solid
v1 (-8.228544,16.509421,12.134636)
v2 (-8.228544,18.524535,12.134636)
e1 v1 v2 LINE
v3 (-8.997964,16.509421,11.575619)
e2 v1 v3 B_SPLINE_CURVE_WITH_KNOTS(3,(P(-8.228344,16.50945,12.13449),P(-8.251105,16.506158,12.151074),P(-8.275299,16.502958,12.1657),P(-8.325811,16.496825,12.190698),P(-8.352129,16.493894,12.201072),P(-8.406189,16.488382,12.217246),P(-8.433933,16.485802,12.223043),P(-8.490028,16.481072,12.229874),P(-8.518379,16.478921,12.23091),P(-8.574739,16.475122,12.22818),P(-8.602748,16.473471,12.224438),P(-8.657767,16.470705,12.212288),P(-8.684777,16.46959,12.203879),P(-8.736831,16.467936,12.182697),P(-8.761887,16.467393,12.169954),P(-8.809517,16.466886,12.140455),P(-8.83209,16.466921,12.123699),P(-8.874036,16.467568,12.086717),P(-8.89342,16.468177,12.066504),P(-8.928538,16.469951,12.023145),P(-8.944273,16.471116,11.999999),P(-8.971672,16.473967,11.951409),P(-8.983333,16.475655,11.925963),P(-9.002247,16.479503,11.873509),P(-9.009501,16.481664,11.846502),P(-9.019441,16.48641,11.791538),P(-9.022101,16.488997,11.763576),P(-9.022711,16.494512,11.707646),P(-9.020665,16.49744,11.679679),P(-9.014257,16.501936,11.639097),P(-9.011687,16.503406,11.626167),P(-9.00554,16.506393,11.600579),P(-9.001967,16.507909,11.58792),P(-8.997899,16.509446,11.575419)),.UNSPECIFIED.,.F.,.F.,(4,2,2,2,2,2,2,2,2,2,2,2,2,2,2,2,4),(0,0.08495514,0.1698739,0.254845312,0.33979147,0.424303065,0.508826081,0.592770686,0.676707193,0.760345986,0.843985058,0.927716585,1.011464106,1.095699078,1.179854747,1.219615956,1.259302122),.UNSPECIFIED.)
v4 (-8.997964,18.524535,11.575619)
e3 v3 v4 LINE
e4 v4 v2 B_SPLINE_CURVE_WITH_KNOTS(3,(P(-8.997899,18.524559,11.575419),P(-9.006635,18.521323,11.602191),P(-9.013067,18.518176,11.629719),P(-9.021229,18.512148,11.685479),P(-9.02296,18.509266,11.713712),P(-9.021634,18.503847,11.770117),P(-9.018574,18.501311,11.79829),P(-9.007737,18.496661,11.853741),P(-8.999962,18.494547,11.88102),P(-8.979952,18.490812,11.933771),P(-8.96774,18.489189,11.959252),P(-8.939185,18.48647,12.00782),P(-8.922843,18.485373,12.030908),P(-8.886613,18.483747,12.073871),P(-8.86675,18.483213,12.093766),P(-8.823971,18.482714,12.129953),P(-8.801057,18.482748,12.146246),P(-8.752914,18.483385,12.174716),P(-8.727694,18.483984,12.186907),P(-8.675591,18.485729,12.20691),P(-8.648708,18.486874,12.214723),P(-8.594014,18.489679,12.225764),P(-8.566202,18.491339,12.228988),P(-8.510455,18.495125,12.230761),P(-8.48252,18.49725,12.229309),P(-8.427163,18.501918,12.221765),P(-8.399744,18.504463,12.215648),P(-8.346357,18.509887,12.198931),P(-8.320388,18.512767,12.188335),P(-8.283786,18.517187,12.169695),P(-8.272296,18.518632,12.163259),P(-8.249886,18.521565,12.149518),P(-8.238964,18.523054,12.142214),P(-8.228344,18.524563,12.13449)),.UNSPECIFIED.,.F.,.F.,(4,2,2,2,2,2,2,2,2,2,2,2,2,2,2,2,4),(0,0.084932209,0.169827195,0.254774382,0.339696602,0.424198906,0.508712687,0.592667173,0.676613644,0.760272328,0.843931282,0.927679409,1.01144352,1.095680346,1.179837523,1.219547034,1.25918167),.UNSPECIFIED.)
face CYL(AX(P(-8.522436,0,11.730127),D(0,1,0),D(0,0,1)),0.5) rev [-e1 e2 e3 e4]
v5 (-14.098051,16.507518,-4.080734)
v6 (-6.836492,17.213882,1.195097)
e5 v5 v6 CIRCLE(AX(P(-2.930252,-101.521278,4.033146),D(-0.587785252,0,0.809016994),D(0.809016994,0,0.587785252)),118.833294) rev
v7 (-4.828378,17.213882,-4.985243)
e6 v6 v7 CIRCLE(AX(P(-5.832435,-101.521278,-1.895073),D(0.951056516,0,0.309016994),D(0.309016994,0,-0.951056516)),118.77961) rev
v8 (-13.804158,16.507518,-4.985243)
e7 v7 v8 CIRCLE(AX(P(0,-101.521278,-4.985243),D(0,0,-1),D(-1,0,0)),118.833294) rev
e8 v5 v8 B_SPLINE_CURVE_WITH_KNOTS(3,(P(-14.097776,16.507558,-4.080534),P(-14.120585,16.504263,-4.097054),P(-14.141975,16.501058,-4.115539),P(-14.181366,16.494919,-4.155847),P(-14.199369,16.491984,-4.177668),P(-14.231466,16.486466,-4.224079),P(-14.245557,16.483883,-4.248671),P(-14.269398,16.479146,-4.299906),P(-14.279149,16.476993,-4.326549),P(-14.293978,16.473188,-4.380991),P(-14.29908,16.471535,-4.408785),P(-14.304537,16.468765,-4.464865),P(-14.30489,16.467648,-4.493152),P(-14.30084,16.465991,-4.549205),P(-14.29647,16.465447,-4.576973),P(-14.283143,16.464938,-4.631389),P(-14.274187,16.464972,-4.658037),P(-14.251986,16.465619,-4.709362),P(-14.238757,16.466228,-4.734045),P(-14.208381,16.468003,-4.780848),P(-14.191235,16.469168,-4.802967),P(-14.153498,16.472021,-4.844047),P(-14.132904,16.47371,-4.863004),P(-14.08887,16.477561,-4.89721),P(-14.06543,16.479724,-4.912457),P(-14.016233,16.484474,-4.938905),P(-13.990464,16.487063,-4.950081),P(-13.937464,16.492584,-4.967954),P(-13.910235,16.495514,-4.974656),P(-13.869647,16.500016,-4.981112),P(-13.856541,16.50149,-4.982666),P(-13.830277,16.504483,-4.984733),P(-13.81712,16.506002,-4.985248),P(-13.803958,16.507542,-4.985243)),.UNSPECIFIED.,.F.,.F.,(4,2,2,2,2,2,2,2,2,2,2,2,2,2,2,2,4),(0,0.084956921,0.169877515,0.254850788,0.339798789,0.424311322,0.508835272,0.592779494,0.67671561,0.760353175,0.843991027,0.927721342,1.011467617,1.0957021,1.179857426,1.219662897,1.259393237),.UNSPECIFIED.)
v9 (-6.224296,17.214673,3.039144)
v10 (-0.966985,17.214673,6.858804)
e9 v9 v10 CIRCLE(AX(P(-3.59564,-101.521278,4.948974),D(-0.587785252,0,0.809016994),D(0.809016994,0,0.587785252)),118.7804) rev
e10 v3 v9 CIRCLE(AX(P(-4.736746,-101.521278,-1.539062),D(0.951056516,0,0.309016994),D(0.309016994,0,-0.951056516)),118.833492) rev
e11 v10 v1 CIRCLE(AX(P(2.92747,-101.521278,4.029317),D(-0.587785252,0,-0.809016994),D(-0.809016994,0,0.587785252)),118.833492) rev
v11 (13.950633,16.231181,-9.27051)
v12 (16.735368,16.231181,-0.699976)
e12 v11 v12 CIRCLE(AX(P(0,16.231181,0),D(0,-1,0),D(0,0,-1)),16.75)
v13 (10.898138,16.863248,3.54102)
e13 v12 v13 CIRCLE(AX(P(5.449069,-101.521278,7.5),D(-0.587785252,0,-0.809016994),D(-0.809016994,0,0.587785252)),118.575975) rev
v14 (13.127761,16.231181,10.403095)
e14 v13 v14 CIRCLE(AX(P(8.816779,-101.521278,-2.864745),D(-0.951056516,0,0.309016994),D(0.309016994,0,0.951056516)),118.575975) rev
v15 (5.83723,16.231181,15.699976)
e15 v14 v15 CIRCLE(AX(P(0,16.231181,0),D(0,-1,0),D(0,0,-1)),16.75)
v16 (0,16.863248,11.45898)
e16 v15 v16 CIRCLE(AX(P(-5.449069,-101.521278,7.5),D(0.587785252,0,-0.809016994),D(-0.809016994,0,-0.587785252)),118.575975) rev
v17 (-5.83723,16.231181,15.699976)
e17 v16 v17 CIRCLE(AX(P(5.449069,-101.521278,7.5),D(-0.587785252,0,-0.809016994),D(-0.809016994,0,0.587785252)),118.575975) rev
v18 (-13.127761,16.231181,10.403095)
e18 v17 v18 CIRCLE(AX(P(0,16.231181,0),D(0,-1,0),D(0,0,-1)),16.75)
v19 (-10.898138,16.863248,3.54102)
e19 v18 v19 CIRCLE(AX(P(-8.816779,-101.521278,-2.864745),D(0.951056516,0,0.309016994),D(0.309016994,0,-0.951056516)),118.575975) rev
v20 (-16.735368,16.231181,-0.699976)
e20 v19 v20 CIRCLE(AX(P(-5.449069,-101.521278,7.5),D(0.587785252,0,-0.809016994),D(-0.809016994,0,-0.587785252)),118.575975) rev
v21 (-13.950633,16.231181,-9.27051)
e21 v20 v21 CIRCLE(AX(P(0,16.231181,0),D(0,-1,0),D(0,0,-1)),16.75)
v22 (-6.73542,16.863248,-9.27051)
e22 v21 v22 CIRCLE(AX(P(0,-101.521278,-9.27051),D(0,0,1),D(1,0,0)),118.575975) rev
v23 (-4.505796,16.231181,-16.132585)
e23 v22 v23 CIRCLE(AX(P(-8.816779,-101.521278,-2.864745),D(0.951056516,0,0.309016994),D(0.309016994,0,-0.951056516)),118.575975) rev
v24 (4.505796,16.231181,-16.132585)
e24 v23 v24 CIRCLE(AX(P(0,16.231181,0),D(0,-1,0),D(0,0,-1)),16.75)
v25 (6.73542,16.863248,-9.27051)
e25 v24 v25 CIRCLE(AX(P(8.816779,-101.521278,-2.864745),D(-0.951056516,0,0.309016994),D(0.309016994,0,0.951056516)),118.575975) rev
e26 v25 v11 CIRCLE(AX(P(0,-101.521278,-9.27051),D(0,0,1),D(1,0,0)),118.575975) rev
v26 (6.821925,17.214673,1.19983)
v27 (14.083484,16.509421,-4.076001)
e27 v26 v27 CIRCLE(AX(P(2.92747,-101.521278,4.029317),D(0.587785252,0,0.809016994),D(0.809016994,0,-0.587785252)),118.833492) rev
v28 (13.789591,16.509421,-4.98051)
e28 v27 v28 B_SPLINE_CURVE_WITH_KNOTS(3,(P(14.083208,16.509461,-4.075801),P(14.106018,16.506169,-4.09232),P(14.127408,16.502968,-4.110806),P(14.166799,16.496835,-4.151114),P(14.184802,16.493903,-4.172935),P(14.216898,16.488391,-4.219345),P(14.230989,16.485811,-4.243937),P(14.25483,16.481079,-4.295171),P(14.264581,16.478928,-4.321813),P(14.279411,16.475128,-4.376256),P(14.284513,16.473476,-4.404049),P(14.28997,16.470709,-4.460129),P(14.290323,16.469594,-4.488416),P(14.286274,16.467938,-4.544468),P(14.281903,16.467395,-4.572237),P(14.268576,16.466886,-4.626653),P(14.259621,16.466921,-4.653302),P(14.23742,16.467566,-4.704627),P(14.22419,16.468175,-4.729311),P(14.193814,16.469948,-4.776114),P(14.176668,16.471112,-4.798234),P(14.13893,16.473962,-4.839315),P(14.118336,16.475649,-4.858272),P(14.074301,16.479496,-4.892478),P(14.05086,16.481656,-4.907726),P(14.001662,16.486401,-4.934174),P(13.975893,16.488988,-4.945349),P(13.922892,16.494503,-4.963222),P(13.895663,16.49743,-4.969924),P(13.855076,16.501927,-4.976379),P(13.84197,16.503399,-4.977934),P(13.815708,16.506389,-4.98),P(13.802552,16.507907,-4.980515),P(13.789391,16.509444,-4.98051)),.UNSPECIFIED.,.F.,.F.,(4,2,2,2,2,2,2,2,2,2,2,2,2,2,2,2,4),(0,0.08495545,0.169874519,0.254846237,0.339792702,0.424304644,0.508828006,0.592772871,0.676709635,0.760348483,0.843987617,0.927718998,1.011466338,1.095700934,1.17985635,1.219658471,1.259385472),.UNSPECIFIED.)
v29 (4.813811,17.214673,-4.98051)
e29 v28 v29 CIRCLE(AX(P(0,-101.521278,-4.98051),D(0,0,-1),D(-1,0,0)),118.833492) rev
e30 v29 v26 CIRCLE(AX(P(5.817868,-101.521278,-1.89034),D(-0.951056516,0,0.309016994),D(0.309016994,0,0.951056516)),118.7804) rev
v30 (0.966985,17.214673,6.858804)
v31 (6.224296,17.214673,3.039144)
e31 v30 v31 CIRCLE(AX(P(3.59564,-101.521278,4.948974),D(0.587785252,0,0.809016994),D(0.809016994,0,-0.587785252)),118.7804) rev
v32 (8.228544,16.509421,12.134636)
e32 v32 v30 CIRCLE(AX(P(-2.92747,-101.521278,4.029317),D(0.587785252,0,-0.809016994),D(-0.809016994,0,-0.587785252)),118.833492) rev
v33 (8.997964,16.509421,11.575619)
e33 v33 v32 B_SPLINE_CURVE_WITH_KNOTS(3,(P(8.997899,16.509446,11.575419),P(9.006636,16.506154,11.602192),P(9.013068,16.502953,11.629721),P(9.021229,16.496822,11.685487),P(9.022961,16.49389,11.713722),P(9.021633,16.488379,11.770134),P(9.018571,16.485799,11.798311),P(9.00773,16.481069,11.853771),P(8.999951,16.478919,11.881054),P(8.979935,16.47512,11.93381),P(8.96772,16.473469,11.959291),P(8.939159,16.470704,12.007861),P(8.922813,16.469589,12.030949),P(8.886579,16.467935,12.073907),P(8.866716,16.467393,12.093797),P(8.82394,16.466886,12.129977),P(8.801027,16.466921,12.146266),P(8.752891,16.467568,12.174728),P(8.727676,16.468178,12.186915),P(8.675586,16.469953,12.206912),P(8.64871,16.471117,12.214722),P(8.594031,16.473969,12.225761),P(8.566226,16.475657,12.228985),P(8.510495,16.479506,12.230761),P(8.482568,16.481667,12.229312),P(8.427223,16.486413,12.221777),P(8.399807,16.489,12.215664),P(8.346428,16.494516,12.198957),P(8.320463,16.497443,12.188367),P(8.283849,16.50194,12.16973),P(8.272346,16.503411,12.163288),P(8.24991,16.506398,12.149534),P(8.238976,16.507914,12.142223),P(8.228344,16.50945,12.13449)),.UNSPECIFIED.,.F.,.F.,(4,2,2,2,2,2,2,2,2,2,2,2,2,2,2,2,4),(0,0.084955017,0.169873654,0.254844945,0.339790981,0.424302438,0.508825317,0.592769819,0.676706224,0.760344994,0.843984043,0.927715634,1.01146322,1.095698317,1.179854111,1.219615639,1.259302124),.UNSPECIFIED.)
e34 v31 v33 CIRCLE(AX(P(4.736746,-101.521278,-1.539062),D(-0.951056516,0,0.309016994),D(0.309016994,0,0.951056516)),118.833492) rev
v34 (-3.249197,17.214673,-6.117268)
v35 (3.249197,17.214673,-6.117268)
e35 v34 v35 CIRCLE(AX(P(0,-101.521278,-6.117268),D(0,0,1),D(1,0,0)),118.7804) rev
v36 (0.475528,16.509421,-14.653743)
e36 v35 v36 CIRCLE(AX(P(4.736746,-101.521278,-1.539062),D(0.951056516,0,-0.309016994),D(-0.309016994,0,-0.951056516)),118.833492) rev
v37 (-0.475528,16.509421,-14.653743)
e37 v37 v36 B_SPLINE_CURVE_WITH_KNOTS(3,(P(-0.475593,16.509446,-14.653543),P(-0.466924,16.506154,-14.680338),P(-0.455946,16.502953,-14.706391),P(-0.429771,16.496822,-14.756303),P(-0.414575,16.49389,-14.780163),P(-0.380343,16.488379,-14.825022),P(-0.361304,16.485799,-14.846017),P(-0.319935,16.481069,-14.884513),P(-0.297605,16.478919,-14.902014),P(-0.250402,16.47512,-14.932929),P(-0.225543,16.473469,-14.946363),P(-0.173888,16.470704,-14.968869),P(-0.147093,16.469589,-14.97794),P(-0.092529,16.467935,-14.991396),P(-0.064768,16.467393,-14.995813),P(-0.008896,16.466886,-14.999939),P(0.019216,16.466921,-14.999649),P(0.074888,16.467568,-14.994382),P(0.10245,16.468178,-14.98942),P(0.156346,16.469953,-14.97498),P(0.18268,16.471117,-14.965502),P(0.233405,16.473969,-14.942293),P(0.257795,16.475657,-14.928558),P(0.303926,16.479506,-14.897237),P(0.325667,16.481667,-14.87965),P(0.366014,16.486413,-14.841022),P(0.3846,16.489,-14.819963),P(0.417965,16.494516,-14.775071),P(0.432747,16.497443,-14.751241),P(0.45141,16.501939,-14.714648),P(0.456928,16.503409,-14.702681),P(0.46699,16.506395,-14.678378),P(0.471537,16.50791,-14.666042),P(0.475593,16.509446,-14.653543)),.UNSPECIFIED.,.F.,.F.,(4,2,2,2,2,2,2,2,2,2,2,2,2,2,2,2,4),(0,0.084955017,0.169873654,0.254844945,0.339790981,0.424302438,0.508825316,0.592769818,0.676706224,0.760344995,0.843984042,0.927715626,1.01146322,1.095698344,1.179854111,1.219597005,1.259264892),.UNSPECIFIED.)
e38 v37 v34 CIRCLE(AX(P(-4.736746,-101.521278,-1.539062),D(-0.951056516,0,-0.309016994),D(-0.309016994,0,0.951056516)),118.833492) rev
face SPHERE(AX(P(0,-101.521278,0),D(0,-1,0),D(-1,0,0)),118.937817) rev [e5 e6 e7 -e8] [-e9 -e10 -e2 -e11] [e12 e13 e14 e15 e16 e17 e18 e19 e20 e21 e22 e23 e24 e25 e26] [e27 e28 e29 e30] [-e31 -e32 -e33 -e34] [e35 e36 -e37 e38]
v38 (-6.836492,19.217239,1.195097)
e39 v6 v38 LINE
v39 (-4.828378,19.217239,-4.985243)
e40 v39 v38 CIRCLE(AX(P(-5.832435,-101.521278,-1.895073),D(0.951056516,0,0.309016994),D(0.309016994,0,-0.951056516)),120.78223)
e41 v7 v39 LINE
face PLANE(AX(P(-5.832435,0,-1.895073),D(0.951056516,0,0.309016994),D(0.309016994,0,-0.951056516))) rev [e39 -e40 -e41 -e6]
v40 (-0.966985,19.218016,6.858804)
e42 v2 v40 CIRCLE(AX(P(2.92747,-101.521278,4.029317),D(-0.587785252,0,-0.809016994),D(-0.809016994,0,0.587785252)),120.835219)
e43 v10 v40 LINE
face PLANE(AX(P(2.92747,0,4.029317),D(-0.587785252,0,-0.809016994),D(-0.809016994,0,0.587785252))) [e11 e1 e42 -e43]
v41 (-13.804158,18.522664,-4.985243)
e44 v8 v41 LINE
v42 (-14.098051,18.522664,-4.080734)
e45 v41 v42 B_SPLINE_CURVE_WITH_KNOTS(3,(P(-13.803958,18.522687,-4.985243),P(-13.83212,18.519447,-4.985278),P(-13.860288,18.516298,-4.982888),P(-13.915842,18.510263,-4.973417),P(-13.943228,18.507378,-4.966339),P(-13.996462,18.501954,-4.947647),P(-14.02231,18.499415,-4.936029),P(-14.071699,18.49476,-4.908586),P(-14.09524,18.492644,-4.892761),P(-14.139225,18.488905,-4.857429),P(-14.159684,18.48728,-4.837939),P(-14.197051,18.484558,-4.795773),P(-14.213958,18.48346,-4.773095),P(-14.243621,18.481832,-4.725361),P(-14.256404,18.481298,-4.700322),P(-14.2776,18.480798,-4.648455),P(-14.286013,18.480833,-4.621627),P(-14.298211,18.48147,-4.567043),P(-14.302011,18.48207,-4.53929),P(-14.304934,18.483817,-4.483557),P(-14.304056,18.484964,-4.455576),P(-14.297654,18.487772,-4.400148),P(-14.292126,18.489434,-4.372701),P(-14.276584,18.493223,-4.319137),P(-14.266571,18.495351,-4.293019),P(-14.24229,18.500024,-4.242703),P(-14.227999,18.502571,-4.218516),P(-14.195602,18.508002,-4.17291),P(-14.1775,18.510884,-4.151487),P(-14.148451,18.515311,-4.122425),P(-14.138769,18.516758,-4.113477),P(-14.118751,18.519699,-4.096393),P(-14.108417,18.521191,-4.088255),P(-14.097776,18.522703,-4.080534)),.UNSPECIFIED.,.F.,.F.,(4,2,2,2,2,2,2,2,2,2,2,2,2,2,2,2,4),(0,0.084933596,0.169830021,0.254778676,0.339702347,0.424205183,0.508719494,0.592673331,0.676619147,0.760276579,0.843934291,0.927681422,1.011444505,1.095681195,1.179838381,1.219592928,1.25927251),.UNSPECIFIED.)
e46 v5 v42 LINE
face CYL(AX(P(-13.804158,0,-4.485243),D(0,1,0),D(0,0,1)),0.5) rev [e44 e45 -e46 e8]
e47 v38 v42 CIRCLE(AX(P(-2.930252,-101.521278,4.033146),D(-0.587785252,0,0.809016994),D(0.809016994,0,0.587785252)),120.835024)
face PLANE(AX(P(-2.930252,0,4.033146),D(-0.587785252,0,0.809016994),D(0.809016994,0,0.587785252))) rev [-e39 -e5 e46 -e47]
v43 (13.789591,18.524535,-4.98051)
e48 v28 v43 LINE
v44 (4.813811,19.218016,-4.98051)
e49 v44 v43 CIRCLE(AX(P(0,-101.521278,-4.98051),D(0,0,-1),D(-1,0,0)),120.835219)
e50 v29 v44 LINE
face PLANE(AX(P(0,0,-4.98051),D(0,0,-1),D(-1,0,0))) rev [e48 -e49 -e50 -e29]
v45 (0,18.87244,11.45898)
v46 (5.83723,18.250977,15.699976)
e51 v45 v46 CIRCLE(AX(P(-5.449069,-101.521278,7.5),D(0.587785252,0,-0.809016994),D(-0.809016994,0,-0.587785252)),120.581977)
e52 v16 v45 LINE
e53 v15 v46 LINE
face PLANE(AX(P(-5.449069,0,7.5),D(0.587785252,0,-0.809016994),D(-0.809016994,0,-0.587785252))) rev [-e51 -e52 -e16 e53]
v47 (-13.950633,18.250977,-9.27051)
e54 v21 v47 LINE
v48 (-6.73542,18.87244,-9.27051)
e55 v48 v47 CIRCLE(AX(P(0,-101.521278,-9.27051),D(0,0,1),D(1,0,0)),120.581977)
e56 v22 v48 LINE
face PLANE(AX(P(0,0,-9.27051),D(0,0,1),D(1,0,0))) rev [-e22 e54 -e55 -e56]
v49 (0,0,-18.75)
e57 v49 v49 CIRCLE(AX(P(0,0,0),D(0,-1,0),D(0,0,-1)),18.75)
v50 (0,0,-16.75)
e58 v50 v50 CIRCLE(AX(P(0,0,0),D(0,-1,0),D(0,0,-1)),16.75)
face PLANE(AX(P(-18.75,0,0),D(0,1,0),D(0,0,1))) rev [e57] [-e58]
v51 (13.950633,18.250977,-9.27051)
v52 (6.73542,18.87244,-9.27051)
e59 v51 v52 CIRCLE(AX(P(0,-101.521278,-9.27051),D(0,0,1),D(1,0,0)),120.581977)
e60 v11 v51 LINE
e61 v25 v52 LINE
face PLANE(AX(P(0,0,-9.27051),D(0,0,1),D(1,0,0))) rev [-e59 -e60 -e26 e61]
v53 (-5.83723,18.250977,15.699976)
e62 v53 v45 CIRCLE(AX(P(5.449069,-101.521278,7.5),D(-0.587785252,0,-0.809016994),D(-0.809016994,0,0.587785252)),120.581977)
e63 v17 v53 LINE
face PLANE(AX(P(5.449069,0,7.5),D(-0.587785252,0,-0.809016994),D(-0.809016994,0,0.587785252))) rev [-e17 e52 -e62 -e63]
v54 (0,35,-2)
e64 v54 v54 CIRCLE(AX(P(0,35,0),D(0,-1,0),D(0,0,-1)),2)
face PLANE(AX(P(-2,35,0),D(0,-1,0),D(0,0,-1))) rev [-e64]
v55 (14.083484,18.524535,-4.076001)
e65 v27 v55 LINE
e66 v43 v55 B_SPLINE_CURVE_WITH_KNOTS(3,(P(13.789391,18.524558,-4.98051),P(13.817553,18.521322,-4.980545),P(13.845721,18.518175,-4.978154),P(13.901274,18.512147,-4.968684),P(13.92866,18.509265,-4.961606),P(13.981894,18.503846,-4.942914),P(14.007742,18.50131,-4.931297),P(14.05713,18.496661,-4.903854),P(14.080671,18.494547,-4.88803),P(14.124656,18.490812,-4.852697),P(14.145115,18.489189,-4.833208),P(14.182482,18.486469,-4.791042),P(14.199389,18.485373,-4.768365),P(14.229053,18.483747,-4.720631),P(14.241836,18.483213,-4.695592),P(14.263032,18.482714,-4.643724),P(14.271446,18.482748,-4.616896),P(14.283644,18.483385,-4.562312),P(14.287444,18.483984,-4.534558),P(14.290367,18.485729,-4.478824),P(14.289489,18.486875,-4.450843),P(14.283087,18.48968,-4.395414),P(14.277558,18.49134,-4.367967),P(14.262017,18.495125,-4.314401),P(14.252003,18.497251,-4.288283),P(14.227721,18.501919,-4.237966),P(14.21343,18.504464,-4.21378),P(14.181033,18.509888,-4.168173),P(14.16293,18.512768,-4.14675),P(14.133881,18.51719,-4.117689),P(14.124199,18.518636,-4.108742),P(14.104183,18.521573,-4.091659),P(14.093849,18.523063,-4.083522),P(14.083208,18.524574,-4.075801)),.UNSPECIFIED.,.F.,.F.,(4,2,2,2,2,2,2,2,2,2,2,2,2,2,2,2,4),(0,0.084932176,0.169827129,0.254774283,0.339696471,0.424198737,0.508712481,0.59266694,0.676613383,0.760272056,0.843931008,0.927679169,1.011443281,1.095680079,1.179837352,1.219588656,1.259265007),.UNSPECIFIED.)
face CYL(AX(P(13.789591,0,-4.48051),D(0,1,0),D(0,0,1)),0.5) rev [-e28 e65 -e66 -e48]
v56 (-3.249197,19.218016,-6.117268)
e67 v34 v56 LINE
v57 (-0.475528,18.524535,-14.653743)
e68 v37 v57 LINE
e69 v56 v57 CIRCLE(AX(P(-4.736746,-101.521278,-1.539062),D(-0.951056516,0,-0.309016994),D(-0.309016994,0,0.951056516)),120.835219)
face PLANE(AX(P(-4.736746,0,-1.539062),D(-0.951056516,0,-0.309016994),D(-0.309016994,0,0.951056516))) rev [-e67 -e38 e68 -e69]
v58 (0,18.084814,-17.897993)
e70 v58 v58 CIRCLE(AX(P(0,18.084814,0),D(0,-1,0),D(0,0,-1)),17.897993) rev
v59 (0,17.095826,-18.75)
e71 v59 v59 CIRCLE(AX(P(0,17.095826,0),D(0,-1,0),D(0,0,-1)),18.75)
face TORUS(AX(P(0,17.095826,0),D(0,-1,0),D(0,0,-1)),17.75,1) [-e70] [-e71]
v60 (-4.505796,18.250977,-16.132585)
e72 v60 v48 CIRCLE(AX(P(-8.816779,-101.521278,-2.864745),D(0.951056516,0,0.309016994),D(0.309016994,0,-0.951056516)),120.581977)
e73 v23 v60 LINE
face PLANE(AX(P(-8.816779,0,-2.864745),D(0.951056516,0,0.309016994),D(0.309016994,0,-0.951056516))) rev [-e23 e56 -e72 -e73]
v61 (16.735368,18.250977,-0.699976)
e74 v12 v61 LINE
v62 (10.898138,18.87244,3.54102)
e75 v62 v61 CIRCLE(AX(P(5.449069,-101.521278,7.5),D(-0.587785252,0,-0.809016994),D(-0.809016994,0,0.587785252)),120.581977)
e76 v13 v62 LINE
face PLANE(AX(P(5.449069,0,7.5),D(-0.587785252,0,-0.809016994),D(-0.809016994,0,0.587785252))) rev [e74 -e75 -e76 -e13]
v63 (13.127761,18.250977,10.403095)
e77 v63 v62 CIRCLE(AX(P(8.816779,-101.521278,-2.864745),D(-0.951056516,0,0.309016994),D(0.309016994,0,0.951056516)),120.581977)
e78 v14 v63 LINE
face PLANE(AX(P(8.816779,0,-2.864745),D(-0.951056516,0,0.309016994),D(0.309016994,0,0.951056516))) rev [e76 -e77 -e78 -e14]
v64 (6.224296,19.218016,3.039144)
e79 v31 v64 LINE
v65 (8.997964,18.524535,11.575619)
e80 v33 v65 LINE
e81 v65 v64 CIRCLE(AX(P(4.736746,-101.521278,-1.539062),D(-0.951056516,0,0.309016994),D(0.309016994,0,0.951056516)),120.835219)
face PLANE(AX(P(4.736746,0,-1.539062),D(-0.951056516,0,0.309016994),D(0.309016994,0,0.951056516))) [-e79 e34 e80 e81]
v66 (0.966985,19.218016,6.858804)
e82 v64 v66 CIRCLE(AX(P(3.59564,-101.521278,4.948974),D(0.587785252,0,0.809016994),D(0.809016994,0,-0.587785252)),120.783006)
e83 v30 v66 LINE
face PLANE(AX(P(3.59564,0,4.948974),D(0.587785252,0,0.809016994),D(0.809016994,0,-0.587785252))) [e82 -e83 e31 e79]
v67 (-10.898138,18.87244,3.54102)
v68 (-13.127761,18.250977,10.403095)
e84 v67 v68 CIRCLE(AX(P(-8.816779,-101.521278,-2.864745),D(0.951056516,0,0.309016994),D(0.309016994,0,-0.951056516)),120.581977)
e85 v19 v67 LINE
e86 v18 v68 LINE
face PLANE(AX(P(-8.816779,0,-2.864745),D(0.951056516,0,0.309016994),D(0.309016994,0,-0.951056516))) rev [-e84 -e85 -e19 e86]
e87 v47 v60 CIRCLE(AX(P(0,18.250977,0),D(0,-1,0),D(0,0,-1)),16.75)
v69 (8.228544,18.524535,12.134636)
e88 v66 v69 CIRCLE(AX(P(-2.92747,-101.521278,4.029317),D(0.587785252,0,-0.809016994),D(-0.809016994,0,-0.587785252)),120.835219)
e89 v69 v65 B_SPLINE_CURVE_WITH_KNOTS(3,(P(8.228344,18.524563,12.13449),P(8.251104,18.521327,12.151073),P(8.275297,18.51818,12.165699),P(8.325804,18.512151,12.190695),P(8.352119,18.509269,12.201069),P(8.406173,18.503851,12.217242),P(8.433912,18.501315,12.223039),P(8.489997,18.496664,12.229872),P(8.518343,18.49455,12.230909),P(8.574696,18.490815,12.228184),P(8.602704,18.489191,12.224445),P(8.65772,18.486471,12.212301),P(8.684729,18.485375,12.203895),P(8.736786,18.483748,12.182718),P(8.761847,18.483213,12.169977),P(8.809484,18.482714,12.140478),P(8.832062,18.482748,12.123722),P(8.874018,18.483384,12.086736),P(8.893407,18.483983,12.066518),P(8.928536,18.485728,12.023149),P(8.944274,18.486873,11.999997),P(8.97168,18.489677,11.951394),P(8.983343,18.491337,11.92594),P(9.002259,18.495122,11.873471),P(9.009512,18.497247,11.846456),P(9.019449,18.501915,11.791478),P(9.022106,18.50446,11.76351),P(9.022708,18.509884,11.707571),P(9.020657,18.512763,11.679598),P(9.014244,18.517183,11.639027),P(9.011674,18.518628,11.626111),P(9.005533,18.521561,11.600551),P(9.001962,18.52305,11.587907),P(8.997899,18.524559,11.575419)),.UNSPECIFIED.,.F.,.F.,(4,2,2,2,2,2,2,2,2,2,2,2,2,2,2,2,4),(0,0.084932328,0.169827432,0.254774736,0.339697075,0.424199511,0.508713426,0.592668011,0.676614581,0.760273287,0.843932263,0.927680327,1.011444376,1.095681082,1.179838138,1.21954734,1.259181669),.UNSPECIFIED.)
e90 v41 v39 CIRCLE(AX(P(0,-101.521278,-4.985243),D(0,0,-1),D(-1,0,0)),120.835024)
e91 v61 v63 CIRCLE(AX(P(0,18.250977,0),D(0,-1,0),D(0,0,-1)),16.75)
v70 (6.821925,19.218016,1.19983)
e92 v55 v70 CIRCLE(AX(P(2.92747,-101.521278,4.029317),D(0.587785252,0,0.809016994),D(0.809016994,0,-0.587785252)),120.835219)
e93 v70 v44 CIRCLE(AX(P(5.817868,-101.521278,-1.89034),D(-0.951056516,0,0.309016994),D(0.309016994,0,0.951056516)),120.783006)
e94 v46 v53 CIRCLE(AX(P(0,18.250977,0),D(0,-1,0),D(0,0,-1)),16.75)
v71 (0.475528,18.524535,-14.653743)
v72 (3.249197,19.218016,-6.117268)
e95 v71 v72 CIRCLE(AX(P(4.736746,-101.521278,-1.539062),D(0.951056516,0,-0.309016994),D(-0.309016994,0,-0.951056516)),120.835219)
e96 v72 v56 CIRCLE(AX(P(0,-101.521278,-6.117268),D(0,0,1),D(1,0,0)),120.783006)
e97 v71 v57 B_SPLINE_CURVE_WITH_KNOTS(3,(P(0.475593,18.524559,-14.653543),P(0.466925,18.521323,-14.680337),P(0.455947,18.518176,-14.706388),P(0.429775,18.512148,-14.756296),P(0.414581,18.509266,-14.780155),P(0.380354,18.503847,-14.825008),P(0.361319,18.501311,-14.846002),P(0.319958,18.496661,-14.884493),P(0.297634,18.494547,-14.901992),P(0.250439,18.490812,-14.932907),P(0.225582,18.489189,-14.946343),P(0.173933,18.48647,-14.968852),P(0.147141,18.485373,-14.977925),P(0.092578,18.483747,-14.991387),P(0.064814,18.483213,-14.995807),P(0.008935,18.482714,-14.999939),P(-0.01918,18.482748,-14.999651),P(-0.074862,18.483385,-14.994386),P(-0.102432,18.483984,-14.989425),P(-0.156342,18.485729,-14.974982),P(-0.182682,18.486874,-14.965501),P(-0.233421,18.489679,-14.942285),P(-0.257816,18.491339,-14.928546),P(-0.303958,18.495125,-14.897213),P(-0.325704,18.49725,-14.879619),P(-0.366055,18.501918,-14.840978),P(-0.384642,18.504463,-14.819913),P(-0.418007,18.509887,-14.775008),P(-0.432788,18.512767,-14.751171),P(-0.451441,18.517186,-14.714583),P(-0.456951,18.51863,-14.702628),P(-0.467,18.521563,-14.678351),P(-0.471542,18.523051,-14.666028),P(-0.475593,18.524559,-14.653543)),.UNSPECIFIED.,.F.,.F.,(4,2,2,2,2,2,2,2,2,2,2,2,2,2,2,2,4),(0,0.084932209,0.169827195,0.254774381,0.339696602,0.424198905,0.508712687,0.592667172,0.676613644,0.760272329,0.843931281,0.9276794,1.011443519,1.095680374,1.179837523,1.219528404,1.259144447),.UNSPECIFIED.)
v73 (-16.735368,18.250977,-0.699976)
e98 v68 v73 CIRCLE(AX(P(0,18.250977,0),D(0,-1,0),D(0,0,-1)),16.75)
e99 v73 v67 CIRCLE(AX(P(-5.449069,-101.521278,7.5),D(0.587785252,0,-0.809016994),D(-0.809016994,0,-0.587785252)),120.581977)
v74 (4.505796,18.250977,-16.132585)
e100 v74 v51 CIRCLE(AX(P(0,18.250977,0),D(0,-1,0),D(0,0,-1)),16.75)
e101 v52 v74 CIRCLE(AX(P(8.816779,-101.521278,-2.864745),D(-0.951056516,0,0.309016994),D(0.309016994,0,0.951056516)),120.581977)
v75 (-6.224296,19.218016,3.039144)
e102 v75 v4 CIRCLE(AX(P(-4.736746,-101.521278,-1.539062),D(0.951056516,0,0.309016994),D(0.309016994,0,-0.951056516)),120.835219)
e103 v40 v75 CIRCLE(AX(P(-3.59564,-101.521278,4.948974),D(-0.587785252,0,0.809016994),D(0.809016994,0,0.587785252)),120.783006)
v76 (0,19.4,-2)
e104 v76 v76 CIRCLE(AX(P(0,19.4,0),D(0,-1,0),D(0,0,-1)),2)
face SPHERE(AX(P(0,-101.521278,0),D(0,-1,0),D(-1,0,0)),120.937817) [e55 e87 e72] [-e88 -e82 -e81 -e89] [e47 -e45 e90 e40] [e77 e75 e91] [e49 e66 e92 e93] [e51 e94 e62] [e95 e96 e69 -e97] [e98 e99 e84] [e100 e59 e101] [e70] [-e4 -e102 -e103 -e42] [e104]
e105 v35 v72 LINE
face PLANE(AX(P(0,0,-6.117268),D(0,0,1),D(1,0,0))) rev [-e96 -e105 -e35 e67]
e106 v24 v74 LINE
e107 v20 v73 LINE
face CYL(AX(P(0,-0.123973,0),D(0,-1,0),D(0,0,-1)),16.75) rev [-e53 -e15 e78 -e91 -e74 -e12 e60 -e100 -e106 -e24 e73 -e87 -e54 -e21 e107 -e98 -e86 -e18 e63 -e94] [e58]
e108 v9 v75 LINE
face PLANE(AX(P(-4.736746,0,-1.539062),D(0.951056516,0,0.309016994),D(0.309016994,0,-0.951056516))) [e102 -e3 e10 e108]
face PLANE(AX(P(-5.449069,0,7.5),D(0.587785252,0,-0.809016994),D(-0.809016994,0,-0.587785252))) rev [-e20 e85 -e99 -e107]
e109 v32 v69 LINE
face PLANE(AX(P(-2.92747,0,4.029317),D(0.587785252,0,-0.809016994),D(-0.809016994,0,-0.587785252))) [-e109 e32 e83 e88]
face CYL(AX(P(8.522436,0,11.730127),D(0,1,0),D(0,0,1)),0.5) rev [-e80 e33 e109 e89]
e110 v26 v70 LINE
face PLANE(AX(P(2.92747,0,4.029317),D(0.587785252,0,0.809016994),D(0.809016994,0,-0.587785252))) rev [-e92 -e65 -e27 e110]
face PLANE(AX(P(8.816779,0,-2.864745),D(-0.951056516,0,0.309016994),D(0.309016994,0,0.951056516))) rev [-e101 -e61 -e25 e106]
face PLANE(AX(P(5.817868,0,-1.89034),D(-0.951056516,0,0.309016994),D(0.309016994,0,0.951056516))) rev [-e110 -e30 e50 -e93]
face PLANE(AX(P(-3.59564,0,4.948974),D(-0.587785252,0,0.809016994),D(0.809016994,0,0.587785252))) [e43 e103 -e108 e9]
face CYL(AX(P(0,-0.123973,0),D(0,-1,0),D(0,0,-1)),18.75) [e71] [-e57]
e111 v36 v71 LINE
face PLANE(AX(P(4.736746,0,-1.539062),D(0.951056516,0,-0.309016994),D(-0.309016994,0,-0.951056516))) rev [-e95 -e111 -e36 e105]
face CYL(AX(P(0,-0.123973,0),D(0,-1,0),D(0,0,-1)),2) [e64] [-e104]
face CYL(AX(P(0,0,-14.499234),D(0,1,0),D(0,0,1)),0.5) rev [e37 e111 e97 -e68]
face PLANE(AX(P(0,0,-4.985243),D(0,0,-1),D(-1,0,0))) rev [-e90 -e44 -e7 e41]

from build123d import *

# Parameters (mm, degrees)
CUT_EXTRUDE3_DEPTH = 44.91042
CUT_EXTRUDE7_DEPTH = 44.91042
FILLET1_R          = 1


with BuildPart() as part:
    # Sketch1 → Revolve1 (revolve)
    with BuildSketch(Plane.XY):
        with BuildLine():
            Line((-18.75, 0), (-18.75, 17.954213))
            ThreePointArc((-18.75, 17.954213), (-10.400154, 18.968524), (-2, 19.4))
            Line((-2, 19.4), (-2, 35))
            Line((-2, 35), (0, 35))
            Line((0, 35), (0, 17.416539))
            ThreePointArc((0, 17.416539), (-8.395945, 17.119829), (-16.75, 16.231181))
            Line((-16.75, 16.231181), (-16.75, 0))
            Line((-16.75, 0), (-18.75, 0))
        make_face()
    revolve(axis=Axis((0, -0.123973, 0), (0, 1, 0)))

    # Sketch2 → Cut-Extrude3 (cut, through all)
    with BuildSketch(Plane(origin=(0, 35, 0), x_dir=(1, 0, 0), z_dir=(0, 1, 0))):
        with BuildLine():
            ThreePointArc((-16.735368, 0.699976), (-15.930197, -5.176035), (-13.127761, -10.403095))
            Line((-13.127761, -10.403095), (-10.898138, -3.54102))
            Line((-10.898138, -3.54102), (-16.735368, 0.699976))
        make_face()
        with BuildLine():
            Line((0, -11.45898), (-5.83723, -15.699976))
            ThreePointArc((-5.83723, -15.699976), (0, -16.75), (5.83723, -15.699976))
            Line((5.83723, -15.699976), (0, -11.45898))
        make_face()
        with BuildLine():
            Line((-13.950633, 9.27051), (-6.73542, 9.27051))
            Line((-6.73542, 9.27051), (-4.505796, 16.132585))
            ThreePointArc((-4.505796, 16.132585), (-9.845403, 13.551035), (-13.950633, 9.27051))
        make_face()
        with BuildLine():
            Line((16.735368, 0.699976), (10.898138, -3.54102))
            Line((10.898138, -3.54102), (13.127761, -10.403095))
            ThreePointArc((13.127761, -10.403095), (15.930197, -5.176035), (16.735368, 0.699976))
        make_face()
        with BuildLine():
            Line((4.505796, 16.132585), (6.73542, 9.27051))
            Line((6.73542, 9.27051), (13.950633, 9.27051))
            ThreePointArc((13.950633, 9.27051), (9.845403, 13.551035), (4.505796, 16.132585))
        make_face()
    extrude(amount=-CUT_EXTRUDE3_DEPTH, mode=Mode.SUBTRACT)

    # Sketch3 → Cut-Extrude7 (cut, through all)
    with BuildSketch(Plane(origin=(0, 35, 0), x_dir=(1, 0, 0), z_dir=(0, 1, 0))):
        with BuildLine():
            ThreePointArc((-13.804158, 4.985243), (-14.279687, 4.639751), (-14.098051, 4.080734))
            Line((-14.098051, 4.080734), (-6.836492, -1.195097))
            Line((-6.836492, -1.195097), (-4.828378, 4.985243))
            Line((-4.828378, 4.985243), (-13.804158, 4.985243))
        make_face()
        with BuildLine():
            ThreePointArc((0.475528, 14.653743), (0, 14.999234), (-0.475528, 14.653743))
            Line((-0.475528, 14.653743), (-3.249197, 6.117268))
            Line((-3.249197, 6.117268), (3.249197, 6.117268))
            Line((3.249197, 6.117268), (0.475528, 14.653743))
        make_face()
        with BuildLine():
            Line((13.789591, 4.98051), (4.813811, 4.98051))
            Line((4.813811, 4.98051), (6.821925, -1.19983))
            Line((6.821925, -1.19983), (14.083484, 4.076001))
            ThreePointArc((14.083484, 4.076001), (14.26512, 4.635018), (13.789591, 4.98051))
        make_face()
        with BuildLine():
            Line((6.224296, -3.039144), (0.966985, -6.858804))
            Line((0.966985, -6.858804), (8.228544, -12.134636))
            ThreePointArc((8.228544, -12.134636), (8.816329, -12.134636), (8.997964, -11.575619))
            Line((8.997964, -11.575619), (6.224296, -3.039144))
        make_face()
        with BuildLine():
            Line((-0.966985, -6.858804), (-6.224296, -3.039144))
            Line((-6.224296, -3.039144), (-8.997964, -11.575619))
            ThreePointArc((-8.997964, -11.575619), (-8.816329, -12.134636), (-8.228544, -12.134636))
            Line((-8.228544, -12.134636), (-0.966985, -6.858804))
        make_face()
    extrude(amount=-CUT_EXTRUDE7_DEPTH, mode=Mode.SUBTRACT)

    # Fillet1
    fillet1_edges = [part.edges().sort_by_distance(p)[0] for p in [
        (18.75, 17.954213, 0),
    ]]
    fillet(fillet1_edges, radius=FILLET1_R)


solid = part.part
